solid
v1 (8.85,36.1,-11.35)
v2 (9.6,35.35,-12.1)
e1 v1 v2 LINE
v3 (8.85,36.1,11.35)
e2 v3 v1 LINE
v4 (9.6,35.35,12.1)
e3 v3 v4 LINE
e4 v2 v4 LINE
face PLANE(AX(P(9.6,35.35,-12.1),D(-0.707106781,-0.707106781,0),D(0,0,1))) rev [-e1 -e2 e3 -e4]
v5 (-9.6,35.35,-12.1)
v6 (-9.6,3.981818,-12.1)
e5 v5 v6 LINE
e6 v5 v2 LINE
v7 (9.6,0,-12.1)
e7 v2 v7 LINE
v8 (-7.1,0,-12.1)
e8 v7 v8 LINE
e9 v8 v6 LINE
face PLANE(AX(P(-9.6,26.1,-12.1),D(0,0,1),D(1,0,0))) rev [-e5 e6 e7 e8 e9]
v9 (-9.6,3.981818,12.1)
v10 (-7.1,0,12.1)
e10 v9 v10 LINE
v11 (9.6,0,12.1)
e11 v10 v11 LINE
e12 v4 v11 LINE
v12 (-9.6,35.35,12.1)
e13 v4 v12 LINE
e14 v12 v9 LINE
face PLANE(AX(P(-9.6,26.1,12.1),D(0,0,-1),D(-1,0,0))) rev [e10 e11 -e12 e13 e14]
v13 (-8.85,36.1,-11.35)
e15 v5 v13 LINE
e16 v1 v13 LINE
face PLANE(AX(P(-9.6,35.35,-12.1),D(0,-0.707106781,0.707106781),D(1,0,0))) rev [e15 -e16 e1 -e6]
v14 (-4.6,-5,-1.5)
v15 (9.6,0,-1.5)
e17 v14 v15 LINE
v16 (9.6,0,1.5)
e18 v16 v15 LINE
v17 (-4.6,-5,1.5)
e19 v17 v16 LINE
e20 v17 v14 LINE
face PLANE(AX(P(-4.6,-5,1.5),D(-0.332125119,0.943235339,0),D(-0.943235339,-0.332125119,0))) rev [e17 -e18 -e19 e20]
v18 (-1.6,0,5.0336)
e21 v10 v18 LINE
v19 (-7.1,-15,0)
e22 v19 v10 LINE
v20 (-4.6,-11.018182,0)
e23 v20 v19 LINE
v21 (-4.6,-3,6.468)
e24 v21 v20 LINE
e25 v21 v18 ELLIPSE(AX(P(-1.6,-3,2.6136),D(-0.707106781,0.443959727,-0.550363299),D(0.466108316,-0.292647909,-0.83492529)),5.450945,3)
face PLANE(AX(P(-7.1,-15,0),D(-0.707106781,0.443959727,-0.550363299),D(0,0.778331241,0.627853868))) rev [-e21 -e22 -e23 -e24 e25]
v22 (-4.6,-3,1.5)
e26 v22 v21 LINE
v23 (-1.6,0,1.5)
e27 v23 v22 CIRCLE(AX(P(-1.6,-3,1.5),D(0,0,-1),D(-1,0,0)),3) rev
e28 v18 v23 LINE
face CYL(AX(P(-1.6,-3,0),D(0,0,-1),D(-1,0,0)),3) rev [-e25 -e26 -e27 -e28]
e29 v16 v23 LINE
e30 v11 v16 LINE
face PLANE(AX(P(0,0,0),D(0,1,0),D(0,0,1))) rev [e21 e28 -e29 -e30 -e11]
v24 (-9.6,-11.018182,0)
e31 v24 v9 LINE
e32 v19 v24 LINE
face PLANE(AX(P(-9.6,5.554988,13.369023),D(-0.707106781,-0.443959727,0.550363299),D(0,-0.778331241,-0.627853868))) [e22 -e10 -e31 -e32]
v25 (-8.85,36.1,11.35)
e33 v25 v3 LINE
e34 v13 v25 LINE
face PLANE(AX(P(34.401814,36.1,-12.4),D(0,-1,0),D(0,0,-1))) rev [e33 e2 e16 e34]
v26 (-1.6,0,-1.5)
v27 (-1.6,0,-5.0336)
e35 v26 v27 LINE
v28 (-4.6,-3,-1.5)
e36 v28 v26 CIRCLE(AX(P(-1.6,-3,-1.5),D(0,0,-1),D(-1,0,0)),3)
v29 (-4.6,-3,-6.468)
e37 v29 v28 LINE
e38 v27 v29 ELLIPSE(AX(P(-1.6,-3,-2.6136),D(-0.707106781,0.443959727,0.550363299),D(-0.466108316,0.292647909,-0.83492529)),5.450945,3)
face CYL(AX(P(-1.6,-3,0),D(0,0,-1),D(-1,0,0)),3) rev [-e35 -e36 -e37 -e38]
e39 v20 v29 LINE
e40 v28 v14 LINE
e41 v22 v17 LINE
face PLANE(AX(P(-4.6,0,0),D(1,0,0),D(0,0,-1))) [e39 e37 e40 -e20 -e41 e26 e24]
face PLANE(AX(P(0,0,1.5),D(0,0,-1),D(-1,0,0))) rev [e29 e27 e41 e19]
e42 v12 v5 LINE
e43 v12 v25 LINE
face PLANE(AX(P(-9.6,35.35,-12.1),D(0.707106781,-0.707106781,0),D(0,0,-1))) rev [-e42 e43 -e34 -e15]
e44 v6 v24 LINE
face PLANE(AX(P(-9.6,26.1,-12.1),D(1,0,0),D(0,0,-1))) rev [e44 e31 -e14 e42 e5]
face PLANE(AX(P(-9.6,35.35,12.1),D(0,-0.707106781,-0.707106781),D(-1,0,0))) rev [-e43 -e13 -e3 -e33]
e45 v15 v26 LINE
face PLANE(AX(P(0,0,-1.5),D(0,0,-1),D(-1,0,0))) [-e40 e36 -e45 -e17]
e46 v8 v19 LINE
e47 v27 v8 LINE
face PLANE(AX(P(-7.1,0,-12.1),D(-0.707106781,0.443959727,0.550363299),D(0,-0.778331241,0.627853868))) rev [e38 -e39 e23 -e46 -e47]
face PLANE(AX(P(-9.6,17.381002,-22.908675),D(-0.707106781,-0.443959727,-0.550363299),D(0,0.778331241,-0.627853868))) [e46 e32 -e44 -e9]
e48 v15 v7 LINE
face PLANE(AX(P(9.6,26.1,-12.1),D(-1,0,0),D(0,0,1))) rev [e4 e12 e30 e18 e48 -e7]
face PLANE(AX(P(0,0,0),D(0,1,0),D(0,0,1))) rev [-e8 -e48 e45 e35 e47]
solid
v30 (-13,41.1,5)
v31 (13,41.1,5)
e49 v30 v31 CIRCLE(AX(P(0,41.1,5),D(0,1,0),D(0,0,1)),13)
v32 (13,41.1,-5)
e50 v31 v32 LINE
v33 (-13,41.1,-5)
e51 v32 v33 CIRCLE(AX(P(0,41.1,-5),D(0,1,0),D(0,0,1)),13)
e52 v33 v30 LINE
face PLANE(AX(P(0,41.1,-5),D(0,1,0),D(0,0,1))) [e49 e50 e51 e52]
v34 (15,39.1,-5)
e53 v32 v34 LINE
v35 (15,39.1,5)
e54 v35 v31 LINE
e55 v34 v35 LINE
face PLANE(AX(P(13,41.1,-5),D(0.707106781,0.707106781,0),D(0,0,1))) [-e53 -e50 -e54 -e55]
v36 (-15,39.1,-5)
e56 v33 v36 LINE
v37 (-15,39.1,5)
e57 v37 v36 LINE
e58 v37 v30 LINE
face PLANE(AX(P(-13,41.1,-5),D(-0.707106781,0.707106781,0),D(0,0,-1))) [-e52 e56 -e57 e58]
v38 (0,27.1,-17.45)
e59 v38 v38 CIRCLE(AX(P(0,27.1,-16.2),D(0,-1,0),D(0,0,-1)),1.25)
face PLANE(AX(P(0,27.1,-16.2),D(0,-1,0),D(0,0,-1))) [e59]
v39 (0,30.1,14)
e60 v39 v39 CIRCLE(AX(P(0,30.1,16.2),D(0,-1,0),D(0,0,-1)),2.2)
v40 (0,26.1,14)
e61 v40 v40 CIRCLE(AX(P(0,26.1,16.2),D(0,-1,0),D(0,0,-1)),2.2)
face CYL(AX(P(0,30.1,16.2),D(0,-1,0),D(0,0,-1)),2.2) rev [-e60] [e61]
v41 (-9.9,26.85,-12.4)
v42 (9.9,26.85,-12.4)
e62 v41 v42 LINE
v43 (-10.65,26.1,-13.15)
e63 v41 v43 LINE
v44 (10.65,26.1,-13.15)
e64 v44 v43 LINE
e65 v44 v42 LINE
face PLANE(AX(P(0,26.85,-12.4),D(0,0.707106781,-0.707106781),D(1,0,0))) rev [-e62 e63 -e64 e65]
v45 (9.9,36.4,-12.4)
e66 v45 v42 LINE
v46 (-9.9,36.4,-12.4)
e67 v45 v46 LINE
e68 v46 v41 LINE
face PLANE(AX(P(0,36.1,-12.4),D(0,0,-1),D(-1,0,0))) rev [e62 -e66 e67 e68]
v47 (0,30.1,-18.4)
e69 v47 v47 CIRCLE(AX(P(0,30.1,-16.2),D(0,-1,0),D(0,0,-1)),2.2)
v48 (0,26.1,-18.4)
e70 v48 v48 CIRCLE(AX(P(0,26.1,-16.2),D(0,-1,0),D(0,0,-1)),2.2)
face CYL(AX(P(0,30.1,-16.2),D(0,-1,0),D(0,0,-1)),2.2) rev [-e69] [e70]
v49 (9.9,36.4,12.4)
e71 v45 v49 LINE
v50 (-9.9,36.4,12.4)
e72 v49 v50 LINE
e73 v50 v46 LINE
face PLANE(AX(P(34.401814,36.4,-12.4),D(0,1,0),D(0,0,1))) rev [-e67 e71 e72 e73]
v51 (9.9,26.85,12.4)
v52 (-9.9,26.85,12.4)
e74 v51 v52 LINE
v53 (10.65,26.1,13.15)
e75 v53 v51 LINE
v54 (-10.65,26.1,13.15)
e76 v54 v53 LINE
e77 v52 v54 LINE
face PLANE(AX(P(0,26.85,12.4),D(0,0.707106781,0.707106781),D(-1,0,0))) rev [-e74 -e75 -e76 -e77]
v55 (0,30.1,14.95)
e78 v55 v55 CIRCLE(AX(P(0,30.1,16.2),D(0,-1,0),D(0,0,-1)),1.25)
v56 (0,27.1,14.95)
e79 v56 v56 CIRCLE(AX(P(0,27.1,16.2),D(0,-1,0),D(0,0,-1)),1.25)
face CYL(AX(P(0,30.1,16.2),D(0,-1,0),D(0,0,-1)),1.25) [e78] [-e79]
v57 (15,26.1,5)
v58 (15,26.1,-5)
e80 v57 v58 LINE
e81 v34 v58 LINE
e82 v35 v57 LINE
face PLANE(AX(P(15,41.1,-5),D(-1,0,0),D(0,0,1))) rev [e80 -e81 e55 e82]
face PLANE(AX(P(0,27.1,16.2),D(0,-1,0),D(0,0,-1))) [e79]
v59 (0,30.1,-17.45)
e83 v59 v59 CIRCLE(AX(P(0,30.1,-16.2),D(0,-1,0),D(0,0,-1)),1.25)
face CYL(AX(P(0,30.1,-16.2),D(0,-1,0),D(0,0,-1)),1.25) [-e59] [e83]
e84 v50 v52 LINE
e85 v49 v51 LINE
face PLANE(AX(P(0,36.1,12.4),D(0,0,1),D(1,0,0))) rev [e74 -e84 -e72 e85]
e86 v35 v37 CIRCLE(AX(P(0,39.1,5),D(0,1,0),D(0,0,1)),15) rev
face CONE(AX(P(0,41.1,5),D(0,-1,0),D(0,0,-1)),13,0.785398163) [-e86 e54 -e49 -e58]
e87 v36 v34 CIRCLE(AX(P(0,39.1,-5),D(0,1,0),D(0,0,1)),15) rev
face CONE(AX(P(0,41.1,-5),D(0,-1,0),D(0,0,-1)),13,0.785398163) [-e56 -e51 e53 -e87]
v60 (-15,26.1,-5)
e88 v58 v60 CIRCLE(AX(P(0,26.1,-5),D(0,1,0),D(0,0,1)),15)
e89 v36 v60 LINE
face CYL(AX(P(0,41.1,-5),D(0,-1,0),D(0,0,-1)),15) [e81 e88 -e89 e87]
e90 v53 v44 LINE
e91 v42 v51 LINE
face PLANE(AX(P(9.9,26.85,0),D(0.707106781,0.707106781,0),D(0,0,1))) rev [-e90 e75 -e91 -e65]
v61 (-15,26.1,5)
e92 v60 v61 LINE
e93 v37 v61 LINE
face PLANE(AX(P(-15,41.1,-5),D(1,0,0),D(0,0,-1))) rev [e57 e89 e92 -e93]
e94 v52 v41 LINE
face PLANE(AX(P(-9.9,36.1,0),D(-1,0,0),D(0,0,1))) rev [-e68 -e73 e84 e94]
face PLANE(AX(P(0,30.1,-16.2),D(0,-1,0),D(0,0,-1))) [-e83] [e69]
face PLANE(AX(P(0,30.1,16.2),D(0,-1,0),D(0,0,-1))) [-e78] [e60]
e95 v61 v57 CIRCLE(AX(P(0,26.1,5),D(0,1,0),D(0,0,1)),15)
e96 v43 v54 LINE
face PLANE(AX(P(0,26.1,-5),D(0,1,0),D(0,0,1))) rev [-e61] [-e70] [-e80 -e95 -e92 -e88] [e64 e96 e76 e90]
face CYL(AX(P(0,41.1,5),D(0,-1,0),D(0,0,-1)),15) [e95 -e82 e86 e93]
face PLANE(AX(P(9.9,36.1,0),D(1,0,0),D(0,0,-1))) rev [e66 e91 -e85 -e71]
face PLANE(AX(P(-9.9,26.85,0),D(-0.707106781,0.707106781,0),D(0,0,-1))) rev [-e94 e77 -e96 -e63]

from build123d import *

# Parameters (mm, degrees)
SKETCH1_W               = 19.2
SKETCH1_H               = 24.2
BOSS_EXTRUDE1_DEPTH     = 26.1
BOSS_EXTRUDE2_DEPTH     = 15
BOSS_EXTRUDE3_DEPTH     = 5
BOSS_EXTRUDE4_DEPTH     = 1.5
CHAMFER1_SIZE           = 2.5
FILLET1_R               = 3
SKETCH9_W               = 19.8
SKETCH9_H               = 24.8
SKETCH9_W_2             = 19.2
SKETCH9_H_2             = 24.2
CUT_EXTRUDE_THIN1_DEPTH = 10
SKETCH10_W              = 24.8
SKETCH10_H              = 0.3
CUT_EXTRUDE1_DEPTH      = 19.2
SKETCH12_W              = 19.8
SKETCH12_H              = 24.8
CUT_EXTRUDE3_DEPTH      = 0.3
CHAMFER2_SIZE           = 0.75
CHAMFER3_SIZE           = 0.75
SKETCH14_R              = 2.2
SKETCH14_R_2            = 1.25
CUT_EXTRUDE4_DEPTH      = 4
CHAMFER6_SIZE           = 2
SKETCH16_R              = 1.25
CUT_EXTRUDE6_DEPTH      = 1


with BuildPart() as part:
    # Sketch1 → Boss-Extrude1 (new body)
    with BuildSketch(Plane(origin=(0, 0, 0), x_dir=(1, 0, 0), z_dir=(0, 1, 0))):
        Rectangle(SKETCH1_W, SKETCH1_H)
    extrude(amount=BOSS_EXTRUDE1_DEPTH)

    # Sketch2 → Boss-Extrude2 (add)
    with BuildSketch(Plane(origin=(0, 26.1, 0), x_dir=(1, 0, 0), z_dir=(0, 1, 0))):
        with BuildLine():
            Line((15, 5), (15, -5))
            ThreePointArc((15, -5), (0, -20), (-15, -5))
            Line((-15, -5), (-15, 5))
            ThreePointArc((-15, 5), (0, 20), (15, 5))
        make_face()
    extrude(amount=BOSS_EXTRUDE2_DEPTH)

    # Sketch4 → Boss-Extrude3 (add)
    with BuildSketch(Plane.ZY.offset(9.6)):
        Polygon((-12.1, 0), (0, -15), (12.1, 0), align=None)
    extrude(amount=-BOSS_EXTRUDE3_DEPTH)

    # Sketch6 → Boss-Extrude4 (add, symmetric)
    with BuildSketch(Plane.XY):
        Polygon((-4.6, -5), (9.6, 0), (-4.6, 0), align=None)
    extrude(amount=BOSS_EXTRUDE4_DEPTH, both=True)

    # Chamfer1
    chamfer1_edges = [part.edges().sort_by_distance(p)[0] for p in [
        (-9.6, -7.5, -6.05),
        (-4.6, -7.5, -6.05),
        (-9.6, -7.5, 6.05),
        (-4.6, -7.5, 6.05),
    ]]
    chamfer(chamfer1_edges, length=CHAMFER1_SIZE - 0.0001)  # a hair under: the kernel refuses the full size

    # Fillet1
    fillet1_edges = [part.edges().sort_by_distance(p)[0] for p in [
        (-4.6, 0, -5.194064205),
        (-4.6, 0, 5.194064205),
    ]]
    fillet(fillet1_edges, radius=FILLET1_R)

    # Sketch9 → Cut-Extrude-Thin1 (cut)
    with BuildSketch(Plane.XZ.offset(-26.1)):
        Rectangle(SKETCH9_W, SKETCH9_H)
        Rectangle(SKETCH9_W_2, SKETCH9_H_2, mode=Mode.SUBTRACT)
    extrude(amount=-CUT_EXTRUDE_THIN1_DEPTH, mode=Mode.SUBTRACT)

    # Sketch10 → Cut-Extrude1 (cut)
    with BuildSketch(Plane.ZY.offset(9.6)):
        with Locations((0, 36.25)):
            Rectangle(SKETCH10_W, SKETCH10_H)
    extrude(amount=-CUT_EXTRUDE1_DEPTH, mode=Mode.SUBTRACT)


with BuildPart() as cut_extrude1_piece_1:
    # of the separate pieces the step leaves, piece 1, a body of its own (cut_extrude1_pieces)
    add(part.part.solids().sort_by_distance((-1.6, 0, 1.5))[0])

    # Chamfer3
    chamfer3_edges = [cut_extrude1_piece_1.edges().sort_by_distance(p)[0] for p in [
        (0, 36.1, -12.1),
        (9.6, 36.1, 0),
        (0, 36.1, 12.1),
        (-9.6, 36.1, 0),
    ]]
    chamfer(chamfer3_edges, length=CHAMFER3_SIZE)


with BuildPart() as cut_extrude1_piece_2:
    # of the separate pieces the step leaves, piece 2, a body of its own (cut_extrude1_pieces)
    add(part.part.solids().sort_by_distance((9.9, 36.1, 12.4))[0])

    # Sketch12 → Cut-Extrude3 (cut)
    with BuildSketch(Plane.XZ.offset(-36.1)):
        Rectangle(SKETCH12_W, SKETCH12_H)
    extrude(amount=-CUT_EXTRUDE3_DEPTH, mode=Mode.SUBTRACT)

    # Chamfer2
    chamfer2_edges = [cut_extrude1_piece_2.edges().sort_by_distance(p)[0] for p in [
        (9.9, 26.1, 0),
        (0, 26.1, -12.4),
        (-9.9, 26.1, 0),
        (0, 26.1, 12.4),
    ]]
    chamfer(chamfer2_edges, length=CHAMFER2_SIZE)

    # Sketch14 → Cut-Extrude4 (cut)
    # profile 1 of 2: a face of its own
    with BuildSketch(Plane.XZ.offset(-26.1)):
        with Locations(Location((0, -16.2, 0), (0, 0, 270))):
            Circle(SKETCH14_R)
        with Locations(Location((0, -16.2, 0), (0, 0, 270))):
            Circle(SKETCH14_R_2, mode=Mode.SUBTRACT)
    # profile 2 of 2: a face of its own
    with BuildSketch(Plane.XZ.offset(-26.1)):
        with Locations(Location((0, 16.2, 0), (0, 0, 270))):
            Circle(SKETCH14_R)
        with Locations(Location((0, 16.2, 0), (0, 0, 270))):
            Circle(SKETCH14_R_2, mode=Mode.SUBTRACT)
    extrude(amount=-CUT_EXTRUDE4_DEPTH, mode=Mode.SUBTRACT)

    # Chamfer6
    chamfer6_edges = [cut_extrude1_piece_2.edges().sort_by_distance(p)[0] for p in [
        (0, 41.1, -20),
        (-15, 41.1, 0),
        (0, 41.1, 20),
        (15, 41.1, 0),
    ]]
    chamfer(chamfer6_edges, length=CHAMFER6_SIZE)

    # Sketch16 → Cut-Extrude6 (cut)
    with BuildSketch(Plane.XZ.offset(-26.1)):
        with Locations(Location((0, 16.2, 0), (0, 0, 270))):
            Circle(SKETCH16_R)
        with Locations(Location((0, -16.2, 0), (0, 0, 270))):
            Circle(SKETCH16_R)
    extrude(amount=-CUT_EXTRUDE6_DEPTH, mode=Mode.SUBTRACT)


solid = Compound([cut_extrude1_piece_1.part, cut_extrude1_piece_2.part])
